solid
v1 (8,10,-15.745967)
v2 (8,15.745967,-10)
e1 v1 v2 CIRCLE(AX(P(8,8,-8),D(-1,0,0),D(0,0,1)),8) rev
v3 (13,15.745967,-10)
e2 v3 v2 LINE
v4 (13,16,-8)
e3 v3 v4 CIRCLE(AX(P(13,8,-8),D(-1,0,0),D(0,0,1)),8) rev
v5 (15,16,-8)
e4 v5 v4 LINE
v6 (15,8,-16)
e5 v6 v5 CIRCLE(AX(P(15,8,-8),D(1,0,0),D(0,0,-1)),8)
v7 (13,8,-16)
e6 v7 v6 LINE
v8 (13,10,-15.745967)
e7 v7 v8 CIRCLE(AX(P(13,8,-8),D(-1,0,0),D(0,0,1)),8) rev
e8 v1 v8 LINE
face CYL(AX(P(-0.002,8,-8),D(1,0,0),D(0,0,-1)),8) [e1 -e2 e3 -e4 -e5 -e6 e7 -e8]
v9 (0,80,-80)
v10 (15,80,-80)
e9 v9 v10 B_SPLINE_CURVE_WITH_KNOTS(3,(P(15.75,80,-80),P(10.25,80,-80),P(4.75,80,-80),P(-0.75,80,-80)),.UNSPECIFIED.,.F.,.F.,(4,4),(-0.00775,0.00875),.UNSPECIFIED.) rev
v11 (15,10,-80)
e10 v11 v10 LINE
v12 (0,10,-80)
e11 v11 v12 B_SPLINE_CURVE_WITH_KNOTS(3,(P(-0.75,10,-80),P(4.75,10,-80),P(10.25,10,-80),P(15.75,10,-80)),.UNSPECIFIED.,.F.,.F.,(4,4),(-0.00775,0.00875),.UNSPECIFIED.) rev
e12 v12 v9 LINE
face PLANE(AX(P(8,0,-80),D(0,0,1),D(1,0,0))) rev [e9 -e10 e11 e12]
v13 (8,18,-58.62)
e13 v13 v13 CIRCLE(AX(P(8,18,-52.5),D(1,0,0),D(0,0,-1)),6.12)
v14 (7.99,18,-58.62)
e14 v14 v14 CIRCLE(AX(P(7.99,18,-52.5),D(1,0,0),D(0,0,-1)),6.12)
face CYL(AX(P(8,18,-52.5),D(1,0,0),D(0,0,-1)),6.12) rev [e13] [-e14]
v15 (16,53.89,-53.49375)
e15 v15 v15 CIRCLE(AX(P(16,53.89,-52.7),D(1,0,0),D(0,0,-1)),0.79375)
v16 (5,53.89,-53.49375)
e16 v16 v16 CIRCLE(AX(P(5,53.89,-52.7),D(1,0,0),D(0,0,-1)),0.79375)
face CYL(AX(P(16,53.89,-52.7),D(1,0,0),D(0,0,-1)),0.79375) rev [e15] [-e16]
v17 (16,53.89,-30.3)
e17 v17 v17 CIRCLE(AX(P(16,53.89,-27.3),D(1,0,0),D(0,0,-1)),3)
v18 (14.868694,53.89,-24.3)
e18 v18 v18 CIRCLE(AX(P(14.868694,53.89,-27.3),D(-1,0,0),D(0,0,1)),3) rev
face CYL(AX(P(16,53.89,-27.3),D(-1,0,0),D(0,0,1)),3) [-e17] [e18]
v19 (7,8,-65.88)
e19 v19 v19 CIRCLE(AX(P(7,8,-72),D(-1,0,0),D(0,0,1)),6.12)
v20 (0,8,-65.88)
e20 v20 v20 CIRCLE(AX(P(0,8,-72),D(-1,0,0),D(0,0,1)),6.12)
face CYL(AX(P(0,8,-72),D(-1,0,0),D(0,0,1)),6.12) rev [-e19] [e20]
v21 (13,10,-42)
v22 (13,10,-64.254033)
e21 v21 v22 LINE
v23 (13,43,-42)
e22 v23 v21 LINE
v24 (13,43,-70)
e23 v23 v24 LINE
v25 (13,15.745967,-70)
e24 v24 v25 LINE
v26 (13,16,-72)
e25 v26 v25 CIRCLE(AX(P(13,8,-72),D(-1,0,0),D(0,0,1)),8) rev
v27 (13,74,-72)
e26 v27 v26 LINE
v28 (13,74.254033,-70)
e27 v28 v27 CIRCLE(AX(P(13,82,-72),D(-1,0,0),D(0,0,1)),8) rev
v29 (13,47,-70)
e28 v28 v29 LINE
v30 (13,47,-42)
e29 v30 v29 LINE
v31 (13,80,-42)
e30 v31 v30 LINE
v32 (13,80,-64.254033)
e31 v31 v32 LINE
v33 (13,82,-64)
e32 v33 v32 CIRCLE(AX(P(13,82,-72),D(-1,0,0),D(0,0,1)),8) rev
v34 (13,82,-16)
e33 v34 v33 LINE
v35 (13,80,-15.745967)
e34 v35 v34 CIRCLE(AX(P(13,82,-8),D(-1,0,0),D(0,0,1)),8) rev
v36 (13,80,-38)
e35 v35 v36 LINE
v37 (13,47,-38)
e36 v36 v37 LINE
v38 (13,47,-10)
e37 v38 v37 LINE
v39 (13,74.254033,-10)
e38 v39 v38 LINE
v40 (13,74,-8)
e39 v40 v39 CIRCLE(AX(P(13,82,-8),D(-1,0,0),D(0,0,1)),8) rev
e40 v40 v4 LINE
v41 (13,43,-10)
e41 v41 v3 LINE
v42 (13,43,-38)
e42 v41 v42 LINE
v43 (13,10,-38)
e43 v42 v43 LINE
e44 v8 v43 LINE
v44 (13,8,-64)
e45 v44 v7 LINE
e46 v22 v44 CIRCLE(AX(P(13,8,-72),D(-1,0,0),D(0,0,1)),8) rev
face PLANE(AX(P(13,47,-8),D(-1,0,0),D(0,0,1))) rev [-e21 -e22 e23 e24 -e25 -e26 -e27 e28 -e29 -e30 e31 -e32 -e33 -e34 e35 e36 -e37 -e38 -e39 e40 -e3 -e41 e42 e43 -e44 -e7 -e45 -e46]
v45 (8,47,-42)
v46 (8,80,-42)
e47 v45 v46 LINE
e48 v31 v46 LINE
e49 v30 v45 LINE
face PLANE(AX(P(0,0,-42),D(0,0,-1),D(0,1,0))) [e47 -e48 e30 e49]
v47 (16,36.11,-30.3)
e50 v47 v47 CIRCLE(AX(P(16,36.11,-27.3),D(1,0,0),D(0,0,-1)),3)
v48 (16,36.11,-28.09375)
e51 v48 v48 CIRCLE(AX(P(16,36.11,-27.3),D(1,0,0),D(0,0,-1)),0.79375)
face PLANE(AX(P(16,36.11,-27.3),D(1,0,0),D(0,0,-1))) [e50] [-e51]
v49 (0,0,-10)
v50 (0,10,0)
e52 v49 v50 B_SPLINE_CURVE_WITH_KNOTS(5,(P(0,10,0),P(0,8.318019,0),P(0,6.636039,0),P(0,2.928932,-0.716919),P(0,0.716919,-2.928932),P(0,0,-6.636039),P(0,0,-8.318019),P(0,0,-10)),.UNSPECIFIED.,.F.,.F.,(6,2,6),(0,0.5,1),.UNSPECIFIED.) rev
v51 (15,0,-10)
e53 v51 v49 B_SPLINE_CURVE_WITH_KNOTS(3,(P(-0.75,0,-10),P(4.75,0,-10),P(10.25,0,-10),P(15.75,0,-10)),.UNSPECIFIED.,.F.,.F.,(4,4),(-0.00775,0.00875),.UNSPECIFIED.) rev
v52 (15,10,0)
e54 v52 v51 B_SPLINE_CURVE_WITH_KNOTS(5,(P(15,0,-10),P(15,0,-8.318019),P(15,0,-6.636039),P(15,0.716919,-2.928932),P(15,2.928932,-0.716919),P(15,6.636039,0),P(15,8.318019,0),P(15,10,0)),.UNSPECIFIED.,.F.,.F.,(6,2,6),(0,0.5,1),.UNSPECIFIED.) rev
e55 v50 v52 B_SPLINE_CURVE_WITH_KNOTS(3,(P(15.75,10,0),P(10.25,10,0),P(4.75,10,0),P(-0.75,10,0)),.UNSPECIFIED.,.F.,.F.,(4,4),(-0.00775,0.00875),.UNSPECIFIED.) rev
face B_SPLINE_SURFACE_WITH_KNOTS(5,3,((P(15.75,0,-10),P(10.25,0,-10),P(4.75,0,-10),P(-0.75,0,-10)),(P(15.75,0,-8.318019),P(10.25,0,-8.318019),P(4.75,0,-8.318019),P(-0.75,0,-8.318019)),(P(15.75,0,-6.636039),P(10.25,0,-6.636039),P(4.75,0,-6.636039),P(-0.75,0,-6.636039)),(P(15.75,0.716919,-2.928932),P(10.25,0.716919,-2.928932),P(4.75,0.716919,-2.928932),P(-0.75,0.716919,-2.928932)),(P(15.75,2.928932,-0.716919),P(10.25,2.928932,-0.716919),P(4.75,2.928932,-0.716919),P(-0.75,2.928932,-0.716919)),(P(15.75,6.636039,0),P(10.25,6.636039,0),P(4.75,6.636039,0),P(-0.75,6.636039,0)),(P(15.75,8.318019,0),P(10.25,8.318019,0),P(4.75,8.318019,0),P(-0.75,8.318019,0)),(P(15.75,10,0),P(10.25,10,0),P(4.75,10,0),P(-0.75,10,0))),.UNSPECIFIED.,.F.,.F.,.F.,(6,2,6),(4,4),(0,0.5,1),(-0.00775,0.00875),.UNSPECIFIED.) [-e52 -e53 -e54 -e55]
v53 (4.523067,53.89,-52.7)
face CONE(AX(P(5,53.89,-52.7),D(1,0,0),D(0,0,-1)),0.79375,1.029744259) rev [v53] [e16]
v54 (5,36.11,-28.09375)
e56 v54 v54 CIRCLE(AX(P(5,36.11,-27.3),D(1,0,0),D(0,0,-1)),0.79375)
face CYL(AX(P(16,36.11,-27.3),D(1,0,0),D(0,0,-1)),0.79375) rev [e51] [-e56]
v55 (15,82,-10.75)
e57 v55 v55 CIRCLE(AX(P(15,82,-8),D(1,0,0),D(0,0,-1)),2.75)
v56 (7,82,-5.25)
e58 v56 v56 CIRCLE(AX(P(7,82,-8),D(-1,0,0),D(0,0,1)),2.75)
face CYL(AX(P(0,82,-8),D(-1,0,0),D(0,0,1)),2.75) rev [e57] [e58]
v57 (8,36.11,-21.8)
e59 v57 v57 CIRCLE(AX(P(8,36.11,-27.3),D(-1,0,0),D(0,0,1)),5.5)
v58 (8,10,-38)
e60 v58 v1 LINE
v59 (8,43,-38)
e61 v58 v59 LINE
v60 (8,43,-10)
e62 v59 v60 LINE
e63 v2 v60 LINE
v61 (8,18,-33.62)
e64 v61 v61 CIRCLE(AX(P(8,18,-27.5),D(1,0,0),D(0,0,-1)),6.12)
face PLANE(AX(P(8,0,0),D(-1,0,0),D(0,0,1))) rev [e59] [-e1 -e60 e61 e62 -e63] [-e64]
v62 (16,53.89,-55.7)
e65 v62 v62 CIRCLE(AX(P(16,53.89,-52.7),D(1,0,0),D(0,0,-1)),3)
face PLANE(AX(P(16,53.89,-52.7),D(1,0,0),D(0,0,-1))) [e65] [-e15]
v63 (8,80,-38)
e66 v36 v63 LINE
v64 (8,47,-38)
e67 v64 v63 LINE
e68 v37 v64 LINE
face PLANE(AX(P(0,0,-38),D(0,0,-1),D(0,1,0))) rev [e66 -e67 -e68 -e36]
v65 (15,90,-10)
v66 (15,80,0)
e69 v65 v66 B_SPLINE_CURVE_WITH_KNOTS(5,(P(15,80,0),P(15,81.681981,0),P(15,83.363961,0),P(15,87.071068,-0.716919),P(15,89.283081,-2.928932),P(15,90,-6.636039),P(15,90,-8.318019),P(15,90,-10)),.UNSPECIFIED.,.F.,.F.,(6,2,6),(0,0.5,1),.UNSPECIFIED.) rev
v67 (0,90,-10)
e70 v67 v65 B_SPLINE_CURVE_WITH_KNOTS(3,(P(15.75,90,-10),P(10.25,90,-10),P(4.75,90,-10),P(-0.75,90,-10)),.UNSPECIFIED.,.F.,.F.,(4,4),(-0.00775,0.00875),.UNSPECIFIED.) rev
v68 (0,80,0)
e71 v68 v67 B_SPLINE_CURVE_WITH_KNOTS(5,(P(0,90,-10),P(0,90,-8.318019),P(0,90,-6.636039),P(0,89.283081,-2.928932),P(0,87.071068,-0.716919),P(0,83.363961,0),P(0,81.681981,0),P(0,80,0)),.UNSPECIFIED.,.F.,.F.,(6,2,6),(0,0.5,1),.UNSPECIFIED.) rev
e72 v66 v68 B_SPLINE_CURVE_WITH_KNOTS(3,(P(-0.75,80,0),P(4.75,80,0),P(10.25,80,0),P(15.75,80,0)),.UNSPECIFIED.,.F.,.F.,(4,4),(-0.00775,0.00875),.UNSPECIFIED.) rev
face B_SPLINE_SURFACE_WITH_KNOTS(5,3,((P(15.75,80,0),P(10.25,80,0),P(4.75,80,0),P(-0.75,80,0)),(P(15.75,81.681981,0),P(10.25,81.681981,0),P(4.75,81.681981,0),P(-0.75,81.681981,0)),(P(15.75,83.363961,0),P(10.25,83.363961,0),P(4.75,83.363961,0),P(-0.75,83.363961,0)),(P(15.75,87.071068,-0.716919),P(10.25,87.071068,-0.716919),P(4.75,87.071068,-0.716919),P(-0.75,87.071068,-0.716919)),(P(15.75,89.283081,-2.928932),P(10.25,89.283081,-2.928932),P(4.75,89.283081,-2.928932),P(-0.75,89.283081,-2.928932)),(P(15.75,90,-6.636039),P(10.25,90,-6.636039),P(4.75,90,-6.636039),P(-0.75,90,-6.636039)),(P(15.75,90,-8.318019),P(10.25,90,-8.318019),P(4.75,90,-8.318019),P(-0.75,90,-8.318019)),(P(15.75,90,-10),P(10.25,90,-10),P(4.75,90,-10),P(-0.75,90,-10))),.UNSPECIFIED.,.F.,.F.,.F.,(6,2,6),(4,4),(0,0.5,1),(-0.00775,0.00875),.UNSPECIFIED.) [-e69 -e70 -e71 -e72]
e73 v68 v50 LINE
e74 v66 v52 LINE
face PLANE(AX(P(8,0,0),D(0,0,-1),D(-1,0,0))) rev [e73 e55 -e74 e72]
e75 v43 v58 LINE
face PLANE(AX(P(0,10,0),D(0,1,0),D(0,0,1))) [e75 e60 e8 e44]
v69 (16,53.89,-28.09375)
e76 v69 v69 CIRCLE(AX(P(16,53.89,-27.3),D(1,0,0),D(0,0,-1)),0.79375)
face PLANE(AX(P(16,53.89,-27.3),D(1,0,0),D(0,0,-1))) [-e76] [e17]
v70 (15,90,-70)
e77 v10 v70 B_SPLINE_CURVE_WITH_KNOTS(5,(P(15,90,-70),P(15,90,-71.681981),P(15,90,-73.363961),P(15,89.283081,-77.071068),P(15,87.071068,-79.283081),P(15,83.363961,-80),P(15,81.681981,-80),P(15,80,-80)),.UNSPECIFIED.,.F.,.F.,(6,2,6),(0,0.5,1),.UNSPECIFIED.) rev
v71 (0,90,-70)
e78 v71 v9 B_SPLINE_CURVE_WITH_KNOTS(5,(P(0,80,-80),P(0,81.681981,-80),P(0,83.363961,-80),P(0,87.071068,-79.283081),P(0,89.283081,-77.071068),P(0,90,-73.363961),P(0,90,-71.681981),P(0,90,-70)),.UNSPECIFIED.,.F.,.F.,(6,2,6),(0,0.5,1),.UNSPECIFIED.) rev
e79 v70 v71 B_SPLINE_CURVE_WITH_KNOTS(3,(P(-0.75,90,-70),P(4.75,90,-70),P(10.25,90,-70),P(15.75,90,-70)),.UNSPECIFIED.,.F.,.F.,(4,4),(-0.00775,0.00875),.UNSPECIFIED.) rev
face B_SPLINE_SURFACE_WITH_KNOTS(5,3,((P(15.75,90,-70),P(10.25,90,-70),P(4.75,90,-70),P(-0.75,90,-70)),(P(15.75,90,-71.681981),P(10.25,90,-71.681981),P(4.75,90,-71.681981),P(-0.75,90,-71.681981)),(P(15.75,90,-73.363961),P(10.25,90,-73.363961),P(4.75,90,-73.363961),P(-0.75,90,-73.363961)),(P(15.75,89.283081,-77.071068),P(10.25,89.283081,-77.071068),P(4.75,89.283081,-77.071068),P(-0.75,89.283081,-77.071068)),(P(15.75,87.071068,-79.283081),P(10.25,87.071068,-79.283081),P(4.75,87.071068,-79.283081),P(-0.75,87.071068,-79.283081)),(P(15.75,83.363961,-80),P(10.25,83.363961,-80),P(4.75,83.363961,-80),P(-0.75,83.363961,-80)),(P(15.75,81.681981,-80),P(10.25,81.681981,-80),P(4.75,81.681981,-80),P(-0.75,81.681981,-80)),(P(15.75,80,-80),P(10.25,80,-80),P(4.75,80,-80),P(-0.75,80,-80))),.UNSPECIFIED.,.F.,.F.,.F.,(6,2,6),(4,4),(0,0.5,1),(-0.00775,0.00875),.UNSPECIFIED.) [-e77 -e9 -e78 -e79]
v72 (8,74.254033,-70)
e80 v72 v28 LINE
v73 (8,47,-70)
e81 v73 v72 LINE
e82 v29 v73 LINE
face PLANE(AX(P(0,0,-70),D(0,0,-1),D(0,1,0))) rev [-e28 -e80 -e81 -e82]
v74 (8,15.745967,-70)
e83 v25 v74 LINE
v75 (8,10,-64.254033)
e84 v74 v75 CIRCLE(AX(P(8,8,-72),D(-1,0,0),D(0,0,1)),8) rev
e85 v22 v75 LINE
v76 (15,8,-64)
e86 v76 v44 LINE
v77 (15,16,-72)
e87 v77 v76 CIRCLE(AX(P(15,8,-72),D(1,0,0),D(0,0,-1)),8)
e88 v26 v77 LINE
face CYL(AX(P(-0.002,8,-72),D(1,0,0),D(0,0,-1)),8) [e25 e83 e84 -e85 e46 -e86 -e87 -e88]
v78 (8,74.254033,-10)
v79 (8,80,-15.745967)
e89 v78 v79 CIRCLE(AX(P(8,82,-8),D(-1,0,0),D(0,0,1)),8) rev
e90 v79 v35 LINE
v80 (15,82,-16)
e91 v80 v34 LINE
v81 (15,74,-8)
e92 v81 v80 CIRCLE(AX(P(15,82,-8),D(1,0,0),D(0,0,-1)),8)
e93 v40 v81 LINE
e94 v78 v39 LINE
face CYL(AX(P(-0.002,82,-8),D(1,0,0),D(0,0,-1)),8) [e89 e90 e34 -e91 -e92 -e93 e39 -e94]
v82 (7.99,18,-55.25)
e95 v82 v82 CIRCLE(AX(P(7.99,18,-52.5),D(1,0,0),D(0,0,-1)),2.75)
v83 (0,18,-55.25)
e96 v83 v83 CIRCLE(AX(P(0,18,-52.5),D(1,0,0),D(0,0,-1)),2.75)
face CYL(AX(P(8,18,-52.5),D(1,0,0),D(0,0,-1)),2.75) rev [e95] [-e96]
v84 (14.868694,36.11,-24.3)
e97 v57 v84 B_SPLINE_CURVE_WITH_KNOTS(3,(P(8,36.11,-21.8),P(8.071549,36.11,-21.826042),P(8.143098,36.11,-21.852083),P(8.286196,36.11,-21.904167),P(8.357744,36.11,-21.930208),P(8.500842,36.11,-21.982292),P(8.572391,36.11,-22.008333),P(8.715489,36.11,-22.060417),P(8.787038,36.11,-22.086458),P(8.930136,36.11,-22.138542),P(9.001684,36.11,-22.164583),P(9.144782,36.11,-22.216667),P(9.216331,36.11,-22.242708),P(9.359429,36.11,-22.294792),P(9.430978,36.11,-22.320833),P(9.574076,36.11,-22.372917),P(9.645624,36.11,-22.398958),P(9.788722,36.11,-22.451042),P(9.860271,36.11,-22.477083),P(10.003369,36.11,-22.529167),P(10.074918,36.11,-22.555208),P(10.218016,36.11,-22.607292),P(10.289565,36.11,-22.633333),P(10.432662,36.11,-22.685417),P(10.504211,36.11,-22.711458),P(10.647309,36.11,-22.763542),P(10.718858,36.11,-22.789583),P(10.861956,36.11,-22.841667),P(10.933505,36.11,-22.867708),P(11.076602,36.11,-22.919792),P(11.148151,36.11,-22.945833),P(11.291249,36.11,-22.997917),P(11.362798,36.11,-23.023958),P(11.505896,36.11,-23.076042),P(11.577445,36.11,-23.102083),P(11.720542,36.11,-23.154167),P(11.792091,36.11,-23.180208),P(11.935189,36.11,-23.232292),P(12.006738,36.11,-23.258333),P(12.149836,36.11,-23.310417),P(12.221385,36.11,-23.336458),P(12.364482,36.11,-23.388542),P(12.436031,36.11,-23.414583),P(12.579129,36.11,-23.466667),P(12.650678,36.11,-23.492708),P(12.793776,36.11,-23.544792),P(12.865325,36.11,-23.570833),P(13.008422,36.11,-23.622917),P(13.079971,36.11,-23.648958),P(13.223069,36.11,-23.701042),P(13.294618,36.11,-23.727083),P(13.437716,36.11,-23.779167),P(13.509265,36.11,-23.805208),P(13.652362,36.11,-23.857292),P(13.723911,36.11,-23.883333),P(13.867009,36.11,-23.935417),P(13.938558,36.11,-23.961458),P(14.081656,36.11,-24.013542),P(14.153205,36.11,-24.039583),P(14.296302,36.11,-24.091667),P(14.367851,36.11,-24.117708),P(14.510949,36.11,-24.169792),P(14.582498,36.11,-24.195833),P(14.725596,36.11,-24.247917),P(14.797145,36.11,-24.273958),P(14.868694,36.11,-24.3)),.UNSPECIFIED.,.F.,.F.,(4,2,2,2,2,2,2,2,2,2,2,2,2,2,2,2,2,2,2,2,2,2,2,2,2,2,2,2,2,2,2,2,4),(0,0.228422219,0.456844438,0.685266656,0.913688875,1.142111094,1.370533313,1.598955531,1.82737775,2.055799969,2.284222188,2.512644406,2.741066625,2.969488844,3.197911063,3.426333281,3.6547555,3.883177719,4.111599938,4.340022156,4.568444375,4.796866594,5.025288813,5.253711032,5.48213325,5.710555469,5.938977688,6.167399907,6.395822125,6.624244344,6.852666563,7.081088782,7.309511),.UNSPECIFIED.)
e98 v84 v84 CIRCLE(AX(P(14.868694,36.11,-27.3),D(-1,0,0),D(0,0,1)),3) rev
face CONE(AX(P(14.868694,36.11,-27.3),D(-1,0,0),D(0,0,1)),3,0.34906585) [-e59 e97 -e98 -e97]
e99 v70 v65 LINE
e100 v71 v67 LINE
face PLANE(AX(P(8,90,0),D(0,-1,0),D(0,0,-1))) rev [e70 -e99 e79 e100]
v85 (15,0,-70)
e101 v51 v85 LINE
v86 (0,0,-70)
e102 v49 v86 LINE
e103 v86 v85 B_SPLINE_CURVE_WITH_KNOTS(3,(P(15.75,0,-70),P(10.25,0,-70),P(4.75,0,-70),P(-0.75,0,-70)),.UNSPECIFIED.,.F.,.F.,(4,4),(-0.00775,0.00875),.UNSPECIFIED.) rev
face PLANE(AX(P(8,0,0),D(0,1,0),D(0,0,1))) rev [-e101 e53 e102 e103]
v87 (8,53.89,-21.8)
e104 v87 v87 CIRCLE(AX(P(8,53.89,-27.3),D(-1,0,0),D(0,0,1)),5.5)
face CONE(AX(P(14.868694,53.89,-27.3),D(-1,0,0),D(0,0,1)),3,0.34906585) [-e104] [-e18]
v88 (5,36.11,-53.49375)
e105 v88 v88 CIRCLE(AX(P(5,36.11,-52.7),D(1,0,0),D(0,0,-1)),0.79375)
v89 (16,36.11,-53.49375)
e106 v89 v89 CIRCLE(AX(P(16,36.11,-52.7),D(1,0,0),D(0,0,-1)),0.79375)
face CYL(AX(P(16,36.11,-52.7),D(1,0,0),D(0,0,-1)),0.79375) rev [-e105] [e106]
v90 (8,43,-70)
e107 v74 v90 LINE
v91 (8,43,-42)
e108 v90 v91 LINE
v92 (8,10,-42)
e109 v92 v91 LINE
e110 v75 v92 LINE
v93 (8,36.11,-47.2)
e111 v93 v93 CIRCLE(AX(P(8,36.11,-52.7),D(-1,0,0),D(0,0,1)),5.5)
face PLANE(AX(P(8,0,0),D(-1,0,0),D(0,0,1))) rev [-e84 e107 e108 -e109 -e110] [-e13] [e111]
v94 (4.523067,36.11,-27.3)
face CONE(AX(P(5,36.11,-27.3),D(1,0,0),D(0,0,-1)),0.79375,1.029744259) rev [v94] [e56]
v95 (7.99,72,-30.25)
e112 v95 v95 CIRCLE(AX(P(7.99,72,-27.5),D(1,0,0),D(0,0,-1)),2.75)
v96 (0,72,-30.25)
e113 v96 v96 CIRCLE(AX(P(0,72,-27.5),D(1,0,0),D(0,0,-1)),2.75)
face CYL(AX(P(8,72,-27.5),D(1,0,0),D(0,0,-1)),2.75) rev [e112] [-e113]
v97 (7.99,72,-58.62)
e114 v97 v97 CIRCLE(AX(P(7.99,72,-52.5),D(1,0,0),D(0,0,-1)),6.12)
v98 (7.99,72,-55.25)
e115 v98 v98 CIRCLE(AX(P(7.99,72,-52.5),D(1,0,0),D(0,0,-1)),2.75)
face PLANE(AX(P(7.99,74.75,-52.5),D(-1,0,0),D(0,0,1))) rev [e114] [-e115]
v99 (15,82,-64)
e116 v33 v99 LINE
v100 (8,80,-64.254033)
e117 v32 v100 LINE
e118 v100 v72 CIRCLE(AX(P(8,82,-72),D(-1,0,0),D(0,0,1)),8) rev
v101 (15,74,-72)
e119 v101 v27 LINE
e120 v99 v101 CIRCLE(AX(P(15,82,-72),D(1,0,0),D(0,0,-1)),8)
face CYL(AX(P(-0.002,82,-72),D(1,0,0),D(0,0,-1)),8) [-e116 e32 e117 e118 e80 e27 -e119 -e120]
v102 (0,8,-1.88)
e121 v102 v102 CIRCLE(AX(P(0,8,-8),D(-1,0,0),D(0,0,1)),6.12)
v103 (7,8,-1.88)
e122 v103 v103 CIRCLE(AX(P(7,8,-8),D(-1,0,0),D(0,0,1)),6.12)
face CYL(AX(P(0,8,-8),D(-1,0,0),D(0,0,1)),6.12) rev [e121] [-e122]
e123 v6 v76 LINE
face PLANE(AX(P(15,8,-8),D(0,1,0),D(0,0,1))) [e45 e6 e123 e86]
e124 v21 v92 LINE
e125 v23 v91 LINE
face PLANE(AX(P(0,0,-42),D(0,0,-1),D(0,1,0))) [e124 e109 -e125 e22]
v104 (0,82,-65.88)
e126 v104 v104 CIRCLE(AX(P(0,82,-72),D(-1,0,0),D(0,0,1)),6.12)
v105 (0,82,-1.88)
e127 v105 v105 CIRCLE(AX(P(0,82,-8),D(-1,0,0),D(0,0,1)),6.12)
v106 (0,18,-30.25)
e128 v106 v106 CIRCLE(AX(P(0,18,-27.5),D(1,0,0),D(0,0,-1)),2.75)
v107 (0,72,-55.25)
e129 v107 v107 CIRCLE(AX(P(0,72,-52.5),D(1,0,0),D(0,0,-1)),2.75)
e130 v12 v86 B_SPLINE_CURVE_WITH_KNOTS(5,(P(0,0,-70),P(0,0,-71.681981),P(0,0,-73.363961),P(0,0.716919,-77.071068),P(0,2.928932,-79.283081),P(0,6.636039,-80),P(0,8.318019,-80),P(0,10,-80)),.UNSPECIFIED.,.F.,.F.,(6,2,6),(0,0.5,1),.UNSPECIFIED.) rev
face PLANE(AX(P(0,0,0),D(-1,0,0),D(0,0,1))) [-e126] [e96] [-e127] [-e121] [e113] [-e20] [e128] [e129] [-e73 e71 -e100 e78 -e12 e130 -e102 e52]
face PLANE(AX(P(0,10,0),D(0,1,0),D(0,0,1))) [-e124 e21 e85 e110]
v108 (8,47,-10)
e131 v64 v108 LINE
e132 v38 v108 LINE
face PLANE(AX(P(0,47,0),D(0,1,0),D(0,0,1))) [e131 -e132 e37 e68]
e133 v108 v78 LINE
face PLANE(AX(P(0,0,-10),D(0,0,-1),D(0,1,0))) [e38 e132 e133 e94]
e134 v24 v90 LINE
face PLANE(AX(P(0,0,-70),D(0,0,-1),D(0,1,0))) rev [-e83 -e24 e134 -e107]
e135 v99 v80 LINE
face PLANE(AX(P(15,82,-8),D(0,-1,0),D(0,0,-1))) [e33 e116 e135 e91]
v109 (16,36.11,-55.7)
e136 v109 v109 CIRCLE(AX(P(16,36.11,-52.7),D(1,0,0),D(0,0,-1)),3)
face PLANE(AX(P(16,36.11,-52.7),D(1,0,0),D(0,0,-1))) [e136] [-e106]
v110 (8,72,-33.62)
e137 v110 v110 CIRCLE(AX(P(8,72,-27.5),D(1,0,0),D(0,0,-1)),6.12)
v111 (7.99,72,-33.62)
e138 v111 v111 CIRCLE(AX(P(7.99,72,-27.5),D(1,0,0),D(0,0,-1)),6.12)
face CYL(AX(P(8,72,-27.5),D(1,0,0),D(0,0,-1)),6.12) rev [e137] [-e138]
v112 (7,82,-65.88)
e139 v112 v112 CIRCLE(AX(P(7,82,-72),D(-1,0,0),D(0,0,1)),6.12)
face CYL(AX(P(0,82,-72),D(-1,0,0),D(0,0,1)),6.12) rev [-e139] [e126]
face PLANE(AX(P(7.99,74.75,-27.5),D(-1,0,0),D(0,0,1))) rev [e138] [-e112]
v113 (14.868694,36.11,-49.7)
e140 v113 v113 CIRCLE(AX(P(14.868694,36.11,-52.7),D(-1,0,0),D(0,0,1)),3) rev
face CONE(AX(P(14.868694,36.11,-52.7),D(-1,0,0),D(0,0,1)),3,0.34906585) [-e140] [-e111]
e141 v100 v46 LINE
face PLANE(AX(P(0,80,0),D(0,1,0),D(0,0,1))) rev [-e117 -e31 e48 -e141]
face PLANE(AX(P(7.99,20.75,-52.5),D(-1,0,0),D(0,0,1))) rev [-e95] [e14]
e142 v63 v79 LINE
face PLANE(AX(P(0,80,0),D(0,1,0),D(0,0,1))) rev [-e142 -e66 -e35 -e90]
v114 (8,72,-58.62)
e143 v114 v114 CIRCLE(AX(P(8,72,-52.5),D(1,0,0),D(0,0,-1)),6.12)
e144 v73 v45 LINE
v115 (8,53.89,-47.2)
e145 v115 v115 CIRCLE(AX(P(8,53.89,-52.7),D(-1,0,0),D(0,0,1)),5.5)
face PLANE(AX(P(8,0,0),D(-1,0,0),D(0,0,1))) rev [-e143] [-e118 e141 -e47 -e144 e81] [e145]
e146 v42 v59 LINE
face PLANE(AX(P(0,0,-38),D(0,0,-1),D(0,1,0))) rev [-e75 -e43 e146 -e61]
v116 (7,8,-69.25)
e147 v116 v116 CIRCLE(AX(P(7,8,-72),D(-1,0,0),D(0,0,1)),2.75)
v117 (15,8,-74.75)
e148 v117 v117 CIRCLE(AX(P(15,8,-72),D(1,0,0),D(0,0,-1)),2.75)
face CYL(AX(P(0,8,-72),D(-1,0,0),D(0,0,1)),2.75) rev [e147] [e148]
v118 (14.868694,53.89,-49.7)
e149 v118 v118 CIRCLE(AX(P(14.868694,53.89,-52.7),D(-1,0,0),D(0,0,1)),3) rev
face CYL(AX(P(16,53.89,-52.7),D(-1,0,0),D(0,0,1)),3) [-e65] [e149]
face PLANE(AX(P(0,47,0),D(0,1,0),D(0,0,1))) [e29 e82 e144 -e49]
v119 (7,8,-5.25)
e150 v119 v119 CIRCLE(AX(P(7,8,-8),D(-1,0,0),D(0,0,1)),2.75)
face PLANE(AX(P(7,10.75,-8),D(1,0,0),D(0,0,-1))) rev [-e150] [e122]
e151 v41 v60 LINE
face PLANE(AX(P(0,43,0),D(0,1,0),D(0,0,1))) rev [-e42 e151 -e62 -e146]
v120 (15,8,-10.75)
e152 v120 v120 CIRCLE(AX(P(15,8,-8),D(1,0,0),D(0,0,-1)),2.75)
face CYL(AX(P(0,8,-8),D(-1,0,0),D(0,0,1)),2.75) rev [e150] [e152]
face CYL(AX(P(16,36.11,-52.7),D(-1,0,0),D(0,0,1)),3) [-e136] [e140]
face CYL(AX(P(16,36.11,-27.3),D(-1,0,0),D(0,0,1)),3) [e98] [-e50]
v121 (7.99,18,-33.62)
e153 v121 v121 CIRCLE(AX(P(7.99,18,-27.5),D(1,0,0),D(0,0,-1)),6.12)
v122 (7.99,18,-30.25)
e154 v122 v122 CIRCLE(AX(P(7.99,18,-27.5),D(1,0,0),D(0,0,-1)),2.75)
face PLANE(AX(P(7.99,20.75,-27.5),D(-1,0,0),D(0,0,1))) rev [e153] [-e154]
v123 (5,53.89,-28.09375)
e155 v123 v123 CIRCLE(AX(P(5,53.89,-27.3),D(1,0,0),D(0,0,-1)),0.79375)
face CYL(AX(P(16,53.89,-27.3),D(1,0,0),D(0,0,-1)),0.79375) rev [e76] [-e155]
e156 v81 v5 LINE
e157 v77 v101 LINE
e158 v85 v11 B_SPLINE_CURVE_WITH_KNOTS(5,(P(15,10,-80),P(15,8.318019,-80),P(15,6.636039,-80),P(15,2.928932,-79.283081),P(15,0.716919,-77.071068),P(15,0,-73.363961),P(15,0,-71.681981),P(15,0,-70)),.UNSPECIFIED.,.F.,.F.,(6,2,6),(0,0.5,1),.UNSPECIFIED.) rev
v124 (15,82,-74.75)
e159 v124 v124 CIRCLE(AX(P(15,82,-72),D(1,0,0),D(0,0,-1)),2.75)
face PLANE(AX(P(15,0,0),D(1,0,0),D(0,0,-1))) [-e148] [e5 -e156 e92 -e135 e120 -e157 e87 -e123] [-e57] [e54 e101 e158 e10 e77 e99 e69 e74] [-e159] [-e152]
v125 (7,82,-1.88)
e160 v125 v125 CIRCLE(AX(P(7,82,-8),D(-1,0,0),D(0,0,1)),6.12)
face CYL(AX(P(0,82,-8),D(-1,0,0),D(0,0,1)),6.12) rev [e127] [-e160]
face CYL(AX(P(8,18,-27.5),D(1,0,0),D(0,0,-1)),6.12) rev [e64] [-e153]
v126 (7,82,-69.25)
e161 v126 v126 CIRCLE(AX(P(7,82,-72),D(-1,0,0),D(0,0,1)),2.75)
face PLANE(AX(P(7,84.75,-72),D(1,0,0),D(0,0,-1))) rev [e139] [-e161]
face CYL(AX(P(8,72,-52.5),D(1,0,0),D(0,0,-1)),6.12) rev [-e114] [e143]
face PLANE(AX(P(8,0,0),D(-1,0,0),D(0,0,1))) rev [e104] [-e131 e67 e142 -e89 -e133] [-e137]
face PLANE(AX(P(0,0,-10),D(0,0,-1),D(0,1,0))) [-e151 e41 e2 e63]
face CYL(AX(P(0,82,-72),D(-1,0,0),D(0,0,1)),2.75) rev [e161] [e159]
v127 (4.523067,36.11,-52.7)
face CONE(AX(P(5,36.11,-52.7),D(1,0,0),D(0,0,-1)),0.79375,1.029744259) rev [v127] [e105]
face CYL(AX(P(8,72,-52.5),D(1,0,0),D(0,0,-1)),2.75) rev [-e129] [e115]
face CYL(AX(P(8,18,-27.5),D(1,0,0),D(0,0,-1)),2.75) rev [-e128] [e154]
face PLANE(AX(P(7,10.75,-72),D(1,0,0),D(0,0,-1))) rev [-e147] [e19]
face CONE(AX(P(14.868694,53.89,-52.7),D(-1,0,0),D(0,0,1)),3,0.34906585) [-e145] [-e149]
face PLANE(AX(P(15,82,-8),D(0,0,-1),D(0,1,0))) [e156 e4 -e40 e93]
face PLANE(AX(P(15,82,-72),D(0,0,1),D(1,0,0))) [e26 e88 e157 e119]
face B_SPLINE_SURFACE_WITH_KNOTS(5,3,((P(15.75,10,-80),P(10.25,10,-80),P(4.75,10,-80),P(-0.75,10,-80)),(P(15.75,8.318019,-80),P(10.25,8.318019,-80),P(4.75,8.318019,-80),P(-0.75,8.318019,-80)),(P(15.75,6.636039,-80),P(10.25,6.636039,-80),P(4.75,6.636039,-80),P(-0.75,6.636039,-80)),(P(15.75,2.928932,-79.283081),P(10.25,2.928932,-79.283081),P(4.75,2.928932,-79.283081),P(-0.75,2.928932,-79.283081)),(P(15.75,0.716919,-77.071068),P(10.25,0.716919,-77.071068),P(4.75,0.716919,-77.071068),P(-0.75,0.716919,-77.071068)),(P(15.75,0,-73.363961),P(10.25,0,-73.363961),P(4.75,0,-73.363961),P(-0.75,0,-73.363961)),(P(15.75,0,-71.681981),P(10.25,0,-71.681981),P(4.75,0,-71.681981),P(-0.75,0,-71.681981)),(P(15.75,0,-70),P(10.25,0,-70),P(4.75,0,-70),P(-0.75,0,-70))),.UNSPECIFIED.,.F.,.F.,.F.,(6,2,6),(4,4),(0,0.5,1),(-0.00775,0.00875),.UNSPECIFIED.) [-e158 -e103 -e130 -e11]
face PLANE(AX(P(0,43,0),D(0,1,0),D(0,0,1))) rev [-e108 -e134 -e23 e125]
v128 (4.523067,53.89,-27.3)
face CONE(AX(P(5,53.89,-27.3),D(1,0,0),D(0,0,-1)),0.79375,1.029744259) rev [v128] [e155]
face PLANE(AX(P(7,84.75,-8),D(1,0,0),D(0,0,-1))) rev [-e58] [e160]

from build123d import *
from OCP.BRepFilletAPI import BRepFilletAPI_MakeChamfer

# Parameters (mm, degrees)
SKETCH1_W                                 = 80
SKETCH1_H                                 = 90
BOSS_EXTRUDE1_DEPTH                       = 8
SKETCH6_R                                 = 3
BOSS_EXTRUDE7_DEPTH                       = 8
SKETCH7_W                                 = 80
SKETCH7_H                                 = 90
SKETCH7_W_2                               = 64
SKETCH7_H_2                               = 74
BOSS_EXTRUDE2_DEPTH                       = 7
SKETCH10_W                                = 5
SKETCH10_H                                = 64
BOSS_EXTRUDE3_DEPTH                       = 2
LPATTERN1_COUNT                           = 2
LPATTERN1_PITCH                           = 37
LPATTERN1_COL_COUNT                       = 2
LPATTERN1_COL_PITCH                       = 37
CBORE_START                               = -1
CBORE_FOR_M5_HEX_HEAD_BOLT3_OUTLINE_R     = 2.75
CBORE_FOR_M5_HEX_HEAD_BOLT3_DEPTH         = 9
CBORE_START_2                             = 7.99
CBORE_FOR_M5_HEX_HEAD_BOLT3_2_OUTLINE_R   = 6.12
CBORE_FOR_M5_HEX_HEAD_BOLT3_2_OUTLINE_R_2 = 2.75
CBORE_FOR_M5_HEX_HEAD_BOLT3_2_DEPTH       = 0.01
SKETCH11_W                                = 5
SKETCH11_H                                = 74
BOSS_EXTRUDE4_DEPTH                       = 2
LPATTERN2_COUNT                           = 2
LPATTERN2_PITCH                           = 32
LPATTERN2_COL_COUNT                       = 2
LPATTERN2_COL_PITCH                       = 32
BOSS_EXTRUDE6_REACH                       = 123.347
SKETCH20_R                                = 8
CBORE_FOR_M5_HEX_HEAD_BOLT2_D             = 5.5
CBORE_FOR_M5_HEX_HEAD_BOLT2_CBORE_D       = 12.24
CBORE_FOR_M5_HEX_HEAD_BOLT2_CBORE_DEPTH   = 7
FILLET1_SIZE                              = 10
F_1_16_0_0625_DIAMETER_HOLE1_D            = 1.5875
F_1_16_0_0625_DIAMETER_HOLE1_DEPTH        = 11
F_1_16_0_0625_DIAMETER_HOLE1_TIP          = 0.476933116
CHAMFER1_SIZE                             = 2.5
CHAMFER1_SIZE2                            = 6.868693549


with BuildPart() as part:
    # Sketch1 → Boss-Extrude1 (new body)
    with BuildSketch(Plane(origin=(0, 0, 0), x_dir=(0, 0, -1), z_dir=(1, 0, 0))):
        with Locations((40, 45)):
            Rectangle(SKETCH1_W, SKETCH1_H)
    extrude(amount=BOSS_EXTRUDE1_DEPTH)

    # Sketch6 → Boss-Extrude7 (add)
    with BuildSketch(Plane(origin=(8, 0, 0), x_dir=(0, 0, -1), z_dir=(1, 0, 0))):
        with Locations(Location((27.3, 53.89, 0), (0, 0, 180))):
            Circle(SKETCH6_R)
        with Locations(Location((27.3, 36.11, 0), (0, 0, 180))):
            Circle(SKETCH6_R)
        with Locations(Location((52.7, 36.11, 0), (0, 0, 180))):
            Circle(SKETCH6_R)
        with Locations(Location((52.7, 53.89, 0), (0, 0, 180))):
            Circle(SKETCH6_R)
    extrude(amount=BOSS_EXTRUDE7_DEPTH)

    # Sketch7 → Boss-Extrude2 (add)
    with BuildSketch(Plane(origin=(8, 0, 0), x_dir=(0, 0, -1), z_dir=(1, 0, 0))):
        with Locations((40, 45)):
            Rectangle(SKETCH7_W, SKETCH7_H)
        with Locations((40, 45)):
            Rectangle(SKETCH7_W_2, SKETCH7_H_2, mode=Mode.SUBTRACT)
    extrude(amount=BOSS_EXTRUDE2_DEPTH)

    # Sketch10 → Boss-Extrude3 (add, symmetric)
    with BuildSketch(Plane(origin=(0, 45, 0), x_dir=(1, 0, 0), z_dir=(0, 1, 0))):
        with Locations((10.5, 40)):
            Rectangle(SKETCH10_W, SKETCH10_H)
    boss_extrude3 = extrude(amount=BOSS_EXTRUDE3_DEPTH, both=True)

    # LPattern1: Boss-Extrude3 ×2
    with Locations(*[(0, i * LPATTERN1_PITCH, 0) for i in range(1, LPATTERN1_COUNT)]):
        add(boss_extrude3)

    # LPattern1 col: Boss-Extrude3 ×2
    with Locations(*[(0, -i * LPATTERN1_COL_PITCH, 0) for i in range(1, LPATTERN1_COL_COUNT)]):
        add(boss_extrude3)

    # CBORE for M5 Hex Head Bolt3: read off the stored shape, not the designer's step
    # CBORE for M5 Hex Head Bolt3 outline → CBORE for M5 Hex Head Bolt3 (cut)
    with BuildSketch(Plane.YZ.offset(CBORE_START)):
        with Locations((72, -52.5)):
            Circle(CBORE_FOR_M5_HEX_HEAD_BOLT3_OUTLINE_R)
        with Locations((18, -27.5)):
            Circle(CBORE_FOR_M5_HEX_HEAD_BOLT3_OUTLINE_R)
        with Locations((18, -52.5)):
            Circle(CBORE_FOR_M5_HEX_HEAD_BOLT3_OUTLINE_R)
        with Locations((72, -27.5)):
            Circle(CBORE_FOR_M5_HEX_HEAD_BOLT3_OUTLINE_R)
    extrude(amount=CBORE_FOR_M5_HEX_HEAD_BOLT3_DEPTH, mode=Mode.SUBTRACT)

    # CBORE for M5 Hex Head Bolt3 2 outline → CBORE for M5 Hex Head Bolt3 2 (cut)
    # profile 1 of 4: a face of its own
    with BuildSketch(Plane.YZ.offset(CBORE_START_2)):
        with Locations((72, -52.5)):
            Circle(CBORE_FOR_M5_HEX_HEAD_BOLT3_2_OUTLINE_R)
        with Locations((72, -52.5)):
            Circle(CBORE_FOR_M5_HEX_HEAD_BOLT3_2_OUTLINE_R_2, mode=Mode.SUBTRACT)
    # profile 2 of 4: a face of its own
    with BuildSketch(Plane.YZ.offset(CBORE_START_2)):
        with Locations((18, -27.5)):
            Circle(CBORE_FOR_M5_HEX_HEAD_BOLT3_2_OUTLINE_R)
        with Locations((18, -27.5)):
            Circle(CBORE_FOR_M5_HEX_HEAD_BOLT3_2_OUTLINE_R_2, mode=Mode.SUBTRACT)
    # profile 3 of 4: a face of its own
    with BuildSketch(Plane.YZ.offset(CBORE_START_2)):
        with Locations((18, -52.5)):
            Circle(CBORE_FOR_M5_HEX_HEAD_BOLT3_2_OUTLINE_R)
        with Locations((18, -52.5)):
            Circle(CBORE_FOR_M5_HEX_HEAD_BOLT3_2_OUTLINE_R_2, mode=Mode.SUBTRACT)
    # profile 4 of 4: a face of its own
    with BuildSketch(Plane.YZ.offset(CBORE_START_2)):
        with Locations((72, -27.5)):
            Circle(CBORE_FOR_M5_HEX_HEAD_BOLT3_2_OUTLINE_R)
        with Locations((72, -27.5)):
            Circle(CBORE_FOR_M5_HEX_HEAD_BOLT3_2_OUTLINE_R_2, mode=Mode.SUBTRACT)
    extrude(amount=CBORE_FOR_M5_HEX_HEAD_BOLT3_2_DEPTH, mode=Mode.SUBTRACT)

    # Sketch11 → Boss-Extrude4 (add, symmetric)
    with BuildSketch(Plane(origin=(0, 0, -40), x_dir=(-1, 0, 0), z_dir=(0, 0, -1))):
        with Locations((-10.5, 45)):
            Rectangle(SKETCH11_W, SKETCH11_H)
    boss_extrude4 = extrude(amount=BOSS_EXTRUDE4_DEPTH, both=True)

    # LPattern2: Boss-Extrude4 ×2
    with Locations(*[(0, 0, i * LPATTERN2_PITCH) for i in range(1, LPATTERN2_COUNT)]):
        add(boss_extrude4)

    # LPattern2 col: Boss-Extrude4 ×2
    with Locations(*[(0, 0, -i * LPATTERN2_COL_PITCH) for i in range(1, LPATTERN2_COL_COUNT)]):
        add(boss_extrude4)

    # Sketch20 → Boss-Extrude6 (add, up to next)
    with BuildSketch(Plane(origin=(15, 0, 0), x_dir=(0, 0, -1), z_dir=(1, 0, 0)), mode=Mode.PRIVATE) as boss_extrude6_sk1:
        with Locations((8, 82)):
            Circle(SKETCH20_R)
    boss_extrude6_tool1 = extrude(boss_extrude6_sk1.sketch, amount=-BOSS_EXTRUDE6_REACH, mode=Mode.PRIVATE) - part.part
    # Sketch20 → Boss-Extrude6 (add, up to next)
    with BuildSketch(Plane(origin=(15, 0, 0), x_dir=(0, 0, -1), z_dir=(1, 0, 0)), mode=Mode.PRIVATE) as boss_extrude6_sk2:
        with Locations((72, 82)):
            Circle(SKETCH20_R)
    boss_extrude6_tool2 = extrude(boss_extrude6_sk2.sketch, amount=-BOSS_EXTRUDE6_REACH, mode=Mode.PRIVATE) - part.part
    # Sketch20 → Boss-Extrude6 (add, up to next)
    with BuildSketch(Plane(origin=(15, 0, 0), x_dir=(0, 0, -1), z_dir=(1, 0, 0)), mode=Mode.PRIVATE) as boss_extrude6_sk3:
        with Locations((8, 8)):
            Circle(SKETCH20_R)
    boss_extrude6_tool3 = extrude(boss_extrude6_sk3.sketch, amount=-BOSS_EXTRUDE6_REACH, mode=Mode.PRIVATE) - part.part
    # Sketch20 → Boss-Extrude6 (add, up to next)
    with BuildSketch(Plane(origin=(15, 0, 0), x_dir=(0, 0, -1), z_dir=(1, 0, 0)), mode=Mode.PRIVATE) as boss_extrude6_sk4:
        with Locations((72, 8)):
            Circle(SKETCH20_R)
    boss_extrude6_tool4 = extrude(boss_extrude6_sk4.sketch, amount=-BOSS_EXTRUDE6_REACH, mode=Mode.PRIVATE) - part.part
    add(boss_extrude6_tool1.solids().sort_by_distance((15, 82, -8))[0])
    add(boss_extrude6_tool2.solids().sort_by_distance((15, 82, -72))[0])
    add(boss_extrude6_tool3.solids().sort_by_distance((15, 8, -8))[0])
    add(boss_extrude6_tool4.solids().sort_by_distance((15, 8, -72))[0])

    # CBORE for M5 Hex Head Bolt2 (through all)
    with Locations(Plane.ZY):
        with Locations((-8, 82), (-72, 82), (-8, 8), (-72, 8)):
            CounterBoreHole(CBORE_FOR_M5_HEX_HEAD_BOLT2_D / 2, CBORE_FOR_M5_HEX_HEAD_BOLT2_CBORE_D / 2, CBORE_FOR_M5_HEX_HEAD_BOLT2_CBORE_DEPTH)

    # Fillet1
    # a fillet whose section is not a circle: 10 mm, written as the material it takes off along each edge
    with BuildSketch(Plane(origin=(-25, 0, -80), x_dir=(0, 0, 1), z_dir=(1, 0, 0)), Plane(origin=(40, 0, 0), x_dir=(0, 0, -1), z_dir=(-1, 0, 0)), Plane(origin=(40, 90, 0), x_dir=(0, -1, 0), z_dir=(-1, 0, 0)), Plane(origin=(-25, 90, -80), x_dir=(0, -1, 0), z_dir=(1, 0, 0))) as fillet1_piece_1:
        with BuildLine():
            add(Edge.make_bspline([(FILLET1_SIZE, 0), (FILLET1_SIZE * 0.831801948466, 0), (FILLET1_SIZE * 0.663603896932, 0), (FILLET1_SIZE * 0.292893218813, -FILLET1_SIZE * 0.0716919198361), (FILLET1_SIZE * 0.0716919198361, -FILLET1_SIZE * 0.292893218813), (0, -FILLET1_SIZE * 0.663603896932), (0, -FILLET1_SIZE * 0.831801948466), (0, -FILLET1_SIZE)], knots=[0, 0, 0, 0, 0, 0, 0.5, 0.5, 1, 1, 1, 1, 1, 1], degree=5))
            Line((0, -FILLET1_SIZE), (0, 0))
            Line((0, 0), (FILLET1_SIZE, 0))
        make_face()
    extrude(amount=65, mode=Mode.SUBTRACT)

    # 1/16 (0.0625) Diameter Hole1
    with Locations(Plane(origin=(16, 0, 0), x_dir=(0, 0, -1), z_dir=(1, 0, 0))):
        with Locations((27.3, 53.89), (52.7, 53.89), (52.7, 36.11), (27.3, 36.11)):
            Hole(F_1_16_0_0625_DIAMETER_HOLE1_D / 2, depth=F_1_16_0_0625_DIAMETER_HOLE1_DEPTH)
            with Locations((0, 0, -(F_1_16_0_0625_DIAMETER_HOLE1_DEPTH + F_1_16_0_0625_DIAMETER_HOLE1_TIP / 2))):  # 118° drill point
                Cone(0, F_1_16_0_0625_DIAMETER_HOLE1_D / 2, F_1_16_0_0625_DIAMETER_HOLE1_TIP, mode=Mode.SUBTRACT)

    # Chamfer1: one chamfer whose edges measure the first distance from different faces: ONE call of the kernel's chamfer builder (chamfer() names one face for all edges)
    chamfer1_edges_1 = [part.edges().sort_by_distance(p)[0] for p in [
        (8, 53.89, -30.3),
    ]]
    chamfer1_side_1 = [part.faces().sort_by_distance(p)[0] for p in [
        (8, 62.109672107, -23.682631382),
    ]]
    chamfer1_edges_2 = [part.edges().sort_by_distance(p)[0] for p in [
        (8, 36.11, -30.3),
    ]]
    chamfer1_side_2 = [part.faces().sort_by_distance(p)[0] for p in [
        (8, 27.890327893, -23.682631382),
    ]]
    chamfer1_edges_3 = [part.edges().sort_by_distance(p)[0] for p in [
        (8, 36.11, -55.7),
    ]]
    chamfer1_side_3 = [part.faces().sort_by_distance(p)[0] for p in [
        (8, 27.890327893, -56.317368618),
    ]]
    chamfer1_edges_4 = [part.edges().sort_by_distance(p)[0] for p in [
        (8, 53.89, -55.7),
    ]]
    chamfer1_side_4 = [part.faces().sort_by_distance(p)[0] for p in [
        (8, 62.109672107, -56.317368618),
    ]]
    chamfer1 = BRepFilletAPI_MakeChamfer(part.part.solid().wrapped)
    for e in chamfer1_edges_1:
        chamfer1.Add(CHAMFER1_SIZE, CHAMFER1_SIZE2, e.wrapped, chamfer1_side_1[0].wrapped)  # the first distance lies on this face
    for e in chamfer1_edges_2:
        chamfer1.Add(CHAMFER1_SIZE, CHAMFER1_SIZE2, e.wrapped, chamfer1_side_2[0].wrapped)  # the first distance lies on this face
    for e in chamfer1_edges_3:
        chamfer1.Add(CHAMFER1_SIZE, CHAMFER1_SIZE2, e.wrapped, chamfer1_side_3[0].wrapped)  # the first distance lies on this face
    for e in chamfer1_edges_4:
        chamfer1.Add(CHAMFER1_SIZE, CHAMFER1_SIZE2, e.wrapped, chamfer1_side_4[0].wrapped)  # the first distance lies on this face
    add(Compound.cast(chamfer1.Shape()), mode=Mode.REPLACE)


solid = part.part
